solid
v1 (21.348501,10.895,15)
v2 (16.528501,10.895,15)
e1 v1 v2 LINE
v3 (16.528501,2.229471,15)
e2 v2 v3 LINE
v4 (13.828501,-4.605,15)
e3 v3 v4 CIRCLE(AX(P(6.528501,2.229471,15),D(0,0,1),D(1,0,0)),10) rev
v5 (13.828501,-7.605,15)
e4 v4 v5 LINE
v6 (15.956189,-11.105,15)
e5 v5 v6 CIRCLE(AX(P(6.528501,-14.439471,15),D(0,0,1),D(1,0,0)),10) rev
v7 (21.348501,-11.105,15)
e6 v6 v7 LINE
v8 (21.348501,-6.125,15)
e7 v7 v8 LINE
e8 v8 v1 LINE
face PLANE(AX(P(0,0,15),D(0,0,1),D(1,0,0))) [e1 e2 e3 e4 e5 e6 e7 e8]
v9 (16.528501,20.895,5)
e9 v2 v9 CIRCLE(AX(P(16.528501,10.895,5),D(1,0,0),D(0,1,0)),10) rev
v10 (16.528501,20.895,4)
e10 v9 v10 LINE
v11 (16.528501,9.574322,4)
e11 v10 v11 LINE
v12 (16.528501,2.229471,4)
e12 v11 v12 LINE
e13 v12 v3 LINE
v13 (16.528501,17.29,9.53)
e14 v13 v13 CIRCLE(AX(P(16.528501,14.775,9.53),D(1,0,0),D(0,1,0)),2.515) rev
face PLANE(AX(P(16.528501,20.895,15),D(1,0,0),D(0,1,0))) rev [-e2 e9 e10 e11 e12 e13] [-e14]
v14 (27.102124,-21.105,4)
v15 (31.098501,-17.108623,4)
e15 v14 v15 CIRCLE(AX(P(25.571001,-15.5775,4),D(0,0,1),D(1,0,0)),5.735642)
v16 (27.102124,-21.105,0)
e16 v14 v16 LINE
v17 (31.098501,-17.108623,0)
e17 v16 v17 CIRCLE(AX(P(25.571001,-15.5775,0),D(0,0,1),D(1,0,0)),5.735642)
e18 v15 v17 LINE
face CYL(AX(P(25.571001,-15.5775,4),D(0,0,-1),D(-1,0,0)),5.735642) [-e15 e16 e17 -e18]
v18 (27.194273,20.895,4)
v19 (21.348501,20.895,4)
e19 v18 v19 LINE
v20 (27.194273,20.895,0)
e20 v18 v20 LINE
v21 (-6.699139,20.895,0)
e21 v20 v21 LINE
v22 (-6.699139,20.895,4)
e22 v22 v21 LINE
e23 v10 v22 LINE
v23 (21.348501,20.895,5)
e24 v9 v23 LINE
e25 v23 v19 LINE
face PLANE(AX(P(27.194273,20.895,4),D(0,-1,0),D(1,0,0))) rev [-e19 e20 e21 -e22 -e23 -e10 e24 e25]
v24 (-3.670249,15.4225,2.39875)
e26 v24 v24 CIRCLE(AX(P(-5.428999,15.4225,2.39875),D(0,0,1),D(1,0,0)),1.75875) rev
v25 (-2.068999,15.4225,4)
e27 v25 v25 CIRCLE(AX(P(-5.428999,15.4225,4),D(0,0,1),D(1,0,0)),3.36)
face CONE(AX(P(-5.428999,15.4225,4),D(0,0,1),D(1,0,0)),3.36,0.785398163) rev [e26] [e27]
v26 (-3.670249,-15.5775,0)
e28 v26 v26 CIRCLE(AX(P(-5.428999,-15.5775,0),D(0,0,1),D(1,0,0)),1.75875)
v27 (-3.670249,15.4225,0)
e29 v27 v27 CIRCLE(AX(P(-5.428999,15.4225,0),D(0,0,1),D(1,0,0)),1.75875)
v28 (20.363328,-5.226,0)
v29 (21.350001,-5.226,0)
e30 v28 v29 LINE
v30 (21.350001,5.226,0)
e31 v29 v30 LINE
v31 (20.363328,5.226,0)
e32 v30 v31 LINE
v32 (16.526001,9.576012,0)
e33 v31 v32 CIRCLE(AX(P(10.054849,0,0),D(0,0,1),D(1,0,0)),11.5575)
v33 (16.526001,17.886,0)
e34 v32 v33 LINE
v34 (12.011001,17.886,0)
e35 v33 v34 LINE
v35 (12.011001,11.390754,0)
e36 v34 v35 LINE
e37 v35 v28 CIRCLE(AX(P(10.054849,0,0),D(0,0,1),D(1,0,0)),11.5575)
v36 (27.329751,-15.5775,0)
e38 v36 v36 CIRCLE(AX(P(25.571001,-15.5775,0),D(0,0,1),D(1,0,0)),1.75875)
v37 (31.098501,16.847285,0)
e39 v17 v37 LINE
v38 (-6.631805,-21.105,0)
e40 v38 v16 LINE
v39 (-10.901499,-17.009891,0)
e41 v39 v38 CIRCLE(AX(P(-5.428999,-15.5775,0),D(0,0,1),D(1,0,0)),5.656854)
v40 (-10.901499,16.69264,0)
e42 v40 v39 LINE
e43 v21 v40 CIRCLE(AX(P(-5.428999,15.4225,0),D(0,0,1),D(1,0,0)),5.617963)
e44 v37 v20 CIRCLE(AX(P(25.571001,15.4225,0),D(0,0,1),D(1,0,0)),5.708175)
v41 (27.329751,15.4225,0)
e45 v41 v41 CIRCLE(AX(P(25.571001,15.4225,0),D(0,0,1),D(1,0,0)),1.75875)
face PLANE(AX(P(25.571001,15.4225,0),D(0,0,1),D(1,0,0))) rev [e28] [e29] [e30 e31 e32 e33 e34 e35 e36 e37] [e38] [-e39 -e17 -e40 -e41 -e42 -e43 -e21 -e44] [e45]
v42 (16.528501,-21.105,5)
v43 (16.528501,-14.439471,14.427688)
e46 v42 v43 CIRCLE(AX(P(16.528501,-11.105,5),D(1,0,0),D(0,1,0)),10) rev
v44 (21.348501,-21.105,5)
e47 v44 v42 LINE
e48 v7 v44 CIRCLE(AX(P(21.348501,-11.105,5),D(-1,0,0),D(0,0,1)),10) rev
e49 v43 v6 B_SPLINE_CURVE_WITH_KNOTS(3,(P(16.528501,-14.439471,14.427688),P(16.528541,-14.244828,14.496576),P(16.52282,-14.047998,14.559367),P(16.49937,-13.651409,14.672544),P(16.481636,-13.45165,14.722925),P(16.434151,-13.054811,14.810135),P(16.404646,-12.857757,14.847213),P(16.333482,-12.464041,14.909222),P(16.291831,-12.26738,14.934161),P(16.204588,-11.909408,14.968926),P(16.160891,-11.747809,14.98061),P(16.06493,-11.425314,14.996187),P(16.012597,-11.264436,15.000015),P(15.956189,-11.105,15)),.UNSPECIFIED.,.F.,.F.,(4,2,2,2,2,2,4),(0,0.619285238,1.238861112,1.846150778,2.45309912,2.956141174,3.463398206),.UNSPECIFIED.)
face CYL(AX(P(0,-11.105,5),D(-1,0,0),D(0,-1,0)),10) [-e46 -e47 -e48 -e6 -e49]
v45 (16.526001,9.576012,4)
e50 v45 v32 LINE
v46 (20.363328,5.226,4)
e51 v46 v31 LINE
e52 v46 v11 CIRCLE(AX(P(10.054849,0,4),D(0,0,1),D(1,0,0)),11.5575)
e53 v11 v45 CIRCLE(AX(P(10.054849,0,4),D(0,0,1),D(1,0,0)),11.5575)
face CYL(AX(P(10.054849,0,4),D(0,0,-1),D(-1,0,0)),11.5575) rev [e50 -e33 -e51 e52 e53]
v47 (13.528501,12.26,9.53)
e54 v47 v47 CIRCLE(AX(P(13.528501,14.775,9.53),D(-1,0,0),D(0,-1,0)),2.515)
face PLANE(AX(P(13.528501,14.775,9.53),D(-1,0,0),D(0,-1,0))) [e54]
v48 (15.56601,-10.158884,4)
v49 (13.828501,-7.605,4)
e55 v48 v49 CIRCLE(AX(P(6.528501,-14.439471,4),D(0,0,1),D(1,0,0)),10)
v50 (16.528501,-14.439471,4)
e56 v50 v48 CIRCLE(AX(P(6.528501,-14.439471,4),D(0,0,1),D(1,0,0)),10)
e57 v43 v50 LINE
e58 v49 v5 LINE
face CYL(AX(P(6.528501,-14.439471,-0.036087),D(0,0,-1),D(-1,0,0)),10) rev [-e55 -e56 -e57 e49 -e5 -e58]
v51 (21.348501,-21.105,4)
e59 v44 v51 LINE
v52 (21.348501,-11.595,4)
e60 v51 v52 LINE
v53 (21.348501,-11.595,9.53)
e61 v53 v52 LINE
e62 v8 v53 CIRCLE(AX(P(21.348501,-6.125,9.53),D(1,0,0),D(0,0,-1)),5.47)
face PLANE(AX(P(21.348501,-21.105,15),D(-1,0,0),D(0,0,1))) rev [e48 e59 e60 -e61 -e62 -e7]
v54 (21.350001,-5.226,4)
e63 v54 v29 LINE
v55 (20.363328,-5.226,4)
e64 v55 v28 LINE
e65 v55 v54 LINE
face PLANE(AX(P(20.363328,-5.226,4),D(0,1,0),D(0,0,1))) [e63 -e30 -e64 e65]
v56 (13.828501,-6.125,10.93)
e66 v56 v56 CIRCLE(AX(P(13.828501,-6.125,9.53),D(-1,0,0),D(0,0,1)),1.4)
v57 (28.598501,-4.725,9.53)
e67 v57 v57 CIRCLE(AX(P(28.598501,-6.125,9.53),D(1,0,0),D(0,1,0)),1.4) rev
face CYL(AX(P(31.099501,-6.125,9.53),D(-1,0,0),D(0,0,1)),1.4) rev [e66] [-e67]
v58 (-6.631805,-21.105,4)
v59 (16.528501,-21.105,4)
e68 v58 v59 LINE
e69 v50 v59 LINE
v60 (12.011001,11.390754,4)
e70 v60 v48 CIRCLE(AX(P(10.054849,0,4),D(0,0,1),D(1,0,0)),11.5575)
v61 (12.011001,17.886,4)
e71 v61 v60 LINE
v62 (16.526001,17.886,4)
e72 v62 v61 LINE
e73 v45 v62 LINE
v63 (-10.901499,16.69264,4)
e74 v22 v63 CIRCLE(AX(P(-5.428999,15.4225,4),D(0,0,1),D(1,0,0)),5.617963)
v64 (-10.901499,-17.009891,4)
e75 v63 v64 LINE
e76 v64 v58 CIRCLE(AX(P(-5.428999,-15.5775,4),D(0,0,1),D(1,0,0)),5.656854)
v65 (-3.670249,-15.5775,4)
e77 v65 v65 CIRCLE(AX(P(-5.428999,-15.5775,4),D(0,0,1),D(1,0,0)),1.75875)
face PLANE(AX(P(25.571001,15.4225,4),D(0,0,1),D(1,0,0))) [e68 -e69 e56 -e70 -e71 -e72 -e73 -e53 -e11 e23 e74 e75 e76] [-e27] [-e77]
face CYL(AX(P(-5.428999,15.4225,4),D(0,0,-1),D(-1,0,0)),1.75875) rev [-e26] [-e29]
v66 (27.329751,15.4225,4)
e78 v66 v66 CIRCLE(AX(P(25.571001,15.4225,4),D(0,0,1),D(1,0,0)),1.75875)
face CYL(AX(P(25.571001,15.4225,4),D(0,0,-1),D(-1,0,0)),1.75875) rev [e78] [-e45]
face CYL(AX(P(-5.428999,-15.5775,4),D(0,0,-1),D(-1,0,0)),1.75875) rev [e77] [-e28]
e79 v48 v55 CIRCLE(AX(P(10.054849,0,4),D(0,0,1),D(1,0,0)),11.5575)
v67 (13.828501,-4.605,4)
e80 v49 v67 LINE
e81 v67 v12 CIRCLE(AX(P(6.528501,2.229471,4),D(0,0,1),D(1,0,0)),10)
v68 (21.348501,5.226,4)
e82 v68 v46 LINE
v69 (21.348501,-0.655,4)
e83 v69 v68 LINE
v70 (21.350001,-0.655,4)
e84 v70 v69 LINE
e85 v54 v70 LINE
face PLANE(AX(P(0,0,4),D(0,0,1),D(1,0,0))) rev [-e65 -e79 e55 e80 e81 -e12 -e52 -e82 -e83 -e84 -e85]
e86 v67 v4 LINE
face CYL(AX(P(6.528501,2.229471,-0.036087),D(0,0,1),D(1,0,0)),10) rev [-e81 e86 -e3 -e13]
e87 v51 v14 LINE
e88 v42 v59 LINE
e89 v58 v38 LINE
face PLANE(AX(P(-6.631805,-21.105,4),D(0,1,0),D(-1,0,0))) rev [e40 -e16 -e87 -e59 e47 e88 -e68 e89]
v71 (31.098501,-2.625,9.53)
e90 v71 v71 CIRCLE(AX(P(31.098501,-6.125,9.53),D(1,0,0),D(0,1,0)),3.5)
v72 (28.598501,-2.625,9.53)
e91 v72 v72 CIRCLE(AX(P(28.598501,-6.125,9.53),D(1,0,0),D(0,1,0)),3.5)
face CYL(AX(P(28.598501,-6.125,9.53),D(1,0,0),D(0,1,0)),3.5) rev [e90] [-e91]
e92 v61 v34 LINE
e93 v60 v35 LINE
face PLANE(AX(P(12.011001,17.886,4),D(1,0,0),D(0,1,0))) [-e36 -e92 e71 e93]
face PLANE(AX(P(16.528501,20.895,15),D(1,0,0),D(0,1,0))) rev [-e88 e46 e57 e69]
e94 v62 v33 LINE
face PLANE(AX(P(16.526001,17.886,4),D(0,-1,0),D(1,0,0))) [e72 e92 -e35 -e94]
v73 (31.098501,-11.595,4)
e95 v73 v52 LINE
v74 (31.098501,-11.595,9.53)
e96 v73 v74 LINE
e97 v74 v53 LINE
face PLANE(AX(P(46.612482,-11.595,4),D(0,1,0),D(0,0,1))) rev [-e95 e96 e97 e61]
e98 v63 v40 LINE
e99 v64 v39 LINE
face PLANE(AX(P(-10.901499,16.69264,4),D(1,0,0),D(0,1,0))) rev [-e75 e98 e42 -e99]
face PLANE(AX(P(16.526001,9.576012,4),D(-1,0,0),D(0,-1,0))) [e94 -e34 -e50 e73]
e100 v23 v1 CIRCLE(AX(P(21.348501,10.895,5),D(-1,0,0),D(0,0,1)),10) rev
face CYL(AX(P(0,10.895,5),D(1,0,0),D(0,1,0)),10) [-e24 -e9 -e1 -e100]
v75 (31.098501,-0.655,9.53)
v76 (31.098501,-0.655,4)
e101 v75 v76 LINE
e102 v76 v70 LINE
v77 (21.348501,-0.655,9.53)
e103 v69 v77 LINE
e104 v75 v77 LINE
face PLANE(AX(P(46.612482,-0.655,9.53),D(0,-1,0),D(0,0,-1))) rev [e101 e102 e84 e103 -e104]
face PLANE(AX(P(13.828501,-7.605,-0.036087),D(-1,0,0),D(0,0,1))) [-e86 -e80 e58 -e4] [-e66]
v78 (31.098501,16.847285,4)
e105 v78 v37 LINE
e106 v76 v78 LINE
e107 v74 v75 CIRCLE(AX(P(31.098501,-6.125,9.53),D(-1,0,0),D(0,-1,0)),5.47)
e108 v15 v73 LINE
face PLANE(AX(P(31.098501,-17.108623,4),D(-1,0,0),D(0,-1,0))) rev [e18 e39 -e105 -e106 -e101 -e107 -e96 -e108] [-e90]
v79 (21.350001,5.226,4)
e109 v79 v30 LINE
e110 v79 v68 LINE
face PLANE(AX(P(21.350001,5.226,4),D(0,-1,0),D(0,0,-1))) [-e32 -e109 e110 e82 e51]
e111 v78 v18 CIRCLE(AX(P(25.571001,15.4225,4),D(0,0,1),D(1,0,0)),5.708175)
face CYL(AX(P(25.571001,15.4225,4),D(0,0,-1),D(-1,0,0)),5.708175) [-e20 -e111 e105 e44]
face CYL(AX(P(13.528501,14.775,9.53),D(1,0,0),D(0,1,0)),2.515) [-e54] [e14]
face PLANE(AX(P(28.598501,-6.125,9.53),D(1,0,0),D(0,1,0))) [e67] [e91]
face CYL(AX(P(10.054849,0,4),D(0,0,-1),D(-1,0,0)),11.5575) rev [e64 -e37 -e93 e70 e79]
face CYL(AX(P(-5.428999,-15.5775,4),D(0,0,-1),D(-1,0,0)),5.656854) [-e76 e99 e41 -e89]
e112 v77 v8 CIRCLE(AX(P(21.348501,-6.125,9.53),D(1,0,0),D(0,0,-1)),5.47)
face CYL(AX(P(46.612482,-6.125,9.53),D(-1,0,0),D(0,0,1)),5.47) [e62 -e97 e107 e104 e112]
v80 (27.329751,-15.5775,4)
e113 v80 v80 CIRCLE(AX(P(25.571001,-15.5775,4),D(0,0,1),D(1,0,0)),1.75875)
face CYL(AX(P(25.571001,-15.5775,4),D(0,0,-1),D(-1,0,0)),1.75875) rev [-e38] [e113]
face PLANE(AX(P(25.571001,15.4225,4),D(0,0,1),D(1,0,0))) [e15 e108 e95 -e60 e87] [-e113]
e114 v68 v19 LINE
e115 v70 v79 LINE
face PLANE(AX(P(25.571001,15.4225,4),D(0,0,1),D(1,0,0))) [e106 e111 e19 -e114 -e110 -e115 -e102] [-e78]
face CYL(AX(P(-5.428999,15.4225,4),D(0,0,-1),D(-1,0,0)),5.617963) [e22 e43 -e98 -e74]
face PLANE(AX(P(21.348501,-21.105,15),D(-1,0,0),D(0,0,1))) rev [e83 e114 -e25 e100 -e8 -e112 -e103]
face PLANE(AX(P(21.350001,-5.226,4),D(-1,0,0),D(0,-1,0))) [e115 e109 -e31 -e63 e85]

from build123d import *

# Parameters (mm, degrees)
CROQUIS2_R                                           = 1.75875
SALIENTE_EXTRUIR1_DEPTH                              = 4
CROQUIS3_W                                           = 4.82
CROQUIS3_H                                           = 42
SALIENTE_EXTRUIR2_DEPTH                              = 11
CROQUIS5_R                                           = 2.515
SALIENTE_EXTRUIR3_DEPTH                              = 3
CROQUIS6_W                                           = 2.7
CROQUIS6_H                                           = 3
SALIENTE_EXTRUIR4_DEPTH                              = 11
REDONDEO1_R                                          = 10
CORTAR_EXTRUIR1_REACH                                = 37.805
CROQUIS8_R                                           = 1.4
REDONDEO2_R                                          = 10
CROQUIS9_R                                           = 1.4
SALIENTE_EXTRUIR5_DEPTH                              = 9.75
CROQUIS10_R                                          = 3.5
CORTAR_EXTRUIR2_DEPTH                                = 2.5
REFRENTADO_PARA_TORNILLO_TAP_N_CON_CABEZ_D           = 3.3
REFRENTADO_PARA_TORNILLO_TAP_N_CON_CABEZ_CSINK_D     = 6.72
REFRENTADO_PARA_TORNILLO_TAP_N_CON_CABEZ_CSINK_ANGLE = 90


with BuildPart() as part:
    # Croquis2 → Saliente-Extruir1 (new body)
    with BuildSketch(Plane.XY):
        with BuildLine():
            Line((-10.901498769, 16.692640248), (-10.901498769, -17.009890921))
            ThreePointArc((-10.901498769, -17.009890921), (-9.344660807, -19.660096087), (-6.631805383, -21.105))
            Line((-6.631805383, -21.105), (27.102123863, -21.105))
            ThreePointArc((27.102123863, -21.105), (29.626712806, -19.633211575), (31.098501231, -17.108622633))
            Line((31.098501231, -17.108622633), (31.098501231, 16.847284537))
            ThreePointArc((31.098501231, 16.847284537), (29.679453987, 19.385312533), (27.194272919, 20.895))
            Line((27.194272919, 20.895), (-6.699139018, 20.895))
            ThreePointArc((-6.699139018, 20.895), (-9.401498769, 19.395), (-10.901498769, 16.692640248))
        make_face()
        with Locations((-5.428998769, 15.4225)):
            Circle(CROQUIS2_R, mode=Mode.SUBTRACT)
        with Locations((25.571001231, 15.4225)):
            Circle(CROQUIS2_R, mode=Mode.SUBTRACT)
        with Locations((25.571001231, -15.5775)):
            Circle(CROQUIS2_R, mode=Mode.SUBTRACT)
        with Locations((-5.428998769, -15.5775)):
            Circle(CROQUIS2_R, mode=Mode.SUBTRACT)
        with BuildLine():
            Line((20.363327993, -5.226), (21.350001231, -5.226))
            Line((21.350001231, -5.226), (21.350001231, 5.225999923))
            Line((21.350001231, 5.225999923), (20.363328032, 5.225999923))
            ThreePointArc((20.363328032, 5.225999923), (18.722008699, 7.645662593), (16.526001231, 9.57601173))
            Line((16.526001231, 9.57601173), (16.526001231, 17.886))
            Line((16.526001231, 17.886), (12.011001231, 17.886))
            Line((12.011001231, 17.886), (12.011001231, 11.390753987))
            ThreePointArc((12.011001231, 11.390753987), (-0.271544795, -5.190509466), (20.363327993, -5.226))
        make_face(mode=Mode.SUBTRACT)
    extrude(amount=SALIENTE_EXTRUIR1_DEPTH)

    # Croquis3 → Saliente-Extruir2 (add)
    with BuildSketch(Plane.XY.offset(4)):
        with Locations((18.938501231, -0.105)):
            Rectangle(CROQUIS3_W, CROQUIS3_H)
    extrude(amount=SALIENTE_EXTRUIR2_DEPTH)

    # Croquis5 → Saliente-Extruir3 (add)
    with BuildSketch(Plane.ZY.offset(-16.528501231)):
        with Locations(Location((9.53, 14.775, 0), (0, 0, 90))):
            Circle(CROQUIS5_R)
    extrude(amount=SALIENTE_EXTRUIR3_DEPTH)

    # Croquis6 → Saliente-Extruir4 (add)
    with BuildSketch(Plane.XY.offset(15)):
        with Locations((15.178501231, -6.105)):
            Rectangle(CROQUIS6_W, CROQUIS6_H)
    extrude(amount=-SALIENTE_EXTRUIR4_DEPTH)

    # Redondeo1
    # the kernel refuses this fillet: 10 mm, written as the material it adds along each edge
    with BuildSketch(Plane(origin=(16.528501231, -4.605, 15), x_dir=(0, 1, 0), z_dir=(0, 0, -1))) as redondeo1_piece_1:
        with BuildLine():
            CenterArc((6.83447145, -10), REDONDEO1_R, 90, 43.113605946)
            Line((0, -2.7), (-0.136689429, -2.554))
            ThreePointArc((-0.136689429, -2.554), (-0.2, -1.35), (-0.2, 0))
            Line((-0.2, 0), (0, 0.2))
            Line((0, 0.2), (6.83447145, 0.2))
            Line((6.83447145, 0.2), (6.83447145, 0))
        make_face()
    extrude(amount=11)
    with BuildSketch(Plane(origin=(16.528501231, -7.605, 15), x_dir=(0, -1, 0), z_dir=(0, 0, -1))) as redondeo1_piece_2:
        with BuildLine():
            CenterArc((6.83447145, 10), REDONDEO1_R, 226.886394054, 43.113605946)
            Line((0, 2.7), (-0.136689429, 2.554))
            ThreePointArc((-0.136689429, 2.554), (-0.2, 1.35), (-0.2, 0))
            Line((-0.2, 0), (0, -0.2))
            Line((0, -0.2), (6.83447145, -0.2))
            Line((6.83447145, -0.2), (6.83447145, 0))
        make_face()
    extrude(amount=11)

    # Croquis8 → Cortar-Extruir1 (cut, up to next)
    with BuildSketch(Plane.ZY.offset(-13.828501231), mode=Mode.PRIVATE) as cortar_extruir1_sk1:
        with Locations((9.53, -6.125)):
            Circle(CROQUIS8_R)
    cortar_extruir1_tool1 = extrude(cortar_extruir1_sk1.sketch, amount=-CORTAR_EXTRUIR1_REACH, mode=Mode.PRIVATE) & part.part
    add(cortar_extruir1_tool1.solids().sort_by_distance((13.828501, -6.125, 9.53))[0], mode=Mode.SUBTRACT)

    # Redondeo2
    redondeo2_edges = [part.edges().sort_by_distance(p)[0] for p in [
        (18.938501231, -21.105, 15),
        (18.938501231, 20.895, 15),
    ]]
    fillet(redondeo2_edges, radius=REDONDEO2_R)

    # Croquis9 → Saliente-Extruir5 (add)
    with BuildSketch(Plane(origin=(21.348501231, 0, 0), x_dir=(0, 0, -1), z_dir=(1, 0, 0))):
        with BuildLine():
            Line((-9.53, -0.655), (-4, -0.655))
            Line((-4, -0.655), (-4, -11.595))
            Line((-4, -11.595), (-9.53, -11.595))
            ThreePointArc((-9.53, -11.595), (-15, -6.125), (-9.53, -0.655))
        make_face()
        with Locations(Location((-9.53, -6.125, 0), (0, 0, 180))):
            Circle(CROQUIS9_R, mode=Mode.SUBTRACT)
    extrude(amount=SALIENTE_EXTRUIR5_DEPTH)

    # Croquis10 → Cortar-Extruir2 (cut)
    with BuildSketch(Plane(origin=(31.098501231, 0, 0), x_dir=(0, 0, -1), z_dir=(1, 0, 0))):
        with Locations(Location((-9.53, -6.125, 0), (0, 0, 90))):
            Circle(CROQUIS10_R)
    extrude(amount=-CORTAR_EXTRUIR2_DEPTH, mode=Mode.SUBTRACT)

    # Refrentado para tornillo tapón con cabeza plana de clavija de M31 (through all)
    with Locations(Plane.XY.offset(4)):
        with Locations((-5.428998769, 15.4225)):
            CounterSinkHole(REFRENTADO_PARA_TORNILLO_TAP_N_CON_CABEZ_D / 2, REFRENTADO_PARA_TORNILLO_TAP_N_CON_CABEZ_CSINK_D / 2, counter_sink_angle=REFRENTADO_PARA_TORNILLO_TAP_N_CON_CABEZ_CSINK_ANGLE)


solid = part.part
